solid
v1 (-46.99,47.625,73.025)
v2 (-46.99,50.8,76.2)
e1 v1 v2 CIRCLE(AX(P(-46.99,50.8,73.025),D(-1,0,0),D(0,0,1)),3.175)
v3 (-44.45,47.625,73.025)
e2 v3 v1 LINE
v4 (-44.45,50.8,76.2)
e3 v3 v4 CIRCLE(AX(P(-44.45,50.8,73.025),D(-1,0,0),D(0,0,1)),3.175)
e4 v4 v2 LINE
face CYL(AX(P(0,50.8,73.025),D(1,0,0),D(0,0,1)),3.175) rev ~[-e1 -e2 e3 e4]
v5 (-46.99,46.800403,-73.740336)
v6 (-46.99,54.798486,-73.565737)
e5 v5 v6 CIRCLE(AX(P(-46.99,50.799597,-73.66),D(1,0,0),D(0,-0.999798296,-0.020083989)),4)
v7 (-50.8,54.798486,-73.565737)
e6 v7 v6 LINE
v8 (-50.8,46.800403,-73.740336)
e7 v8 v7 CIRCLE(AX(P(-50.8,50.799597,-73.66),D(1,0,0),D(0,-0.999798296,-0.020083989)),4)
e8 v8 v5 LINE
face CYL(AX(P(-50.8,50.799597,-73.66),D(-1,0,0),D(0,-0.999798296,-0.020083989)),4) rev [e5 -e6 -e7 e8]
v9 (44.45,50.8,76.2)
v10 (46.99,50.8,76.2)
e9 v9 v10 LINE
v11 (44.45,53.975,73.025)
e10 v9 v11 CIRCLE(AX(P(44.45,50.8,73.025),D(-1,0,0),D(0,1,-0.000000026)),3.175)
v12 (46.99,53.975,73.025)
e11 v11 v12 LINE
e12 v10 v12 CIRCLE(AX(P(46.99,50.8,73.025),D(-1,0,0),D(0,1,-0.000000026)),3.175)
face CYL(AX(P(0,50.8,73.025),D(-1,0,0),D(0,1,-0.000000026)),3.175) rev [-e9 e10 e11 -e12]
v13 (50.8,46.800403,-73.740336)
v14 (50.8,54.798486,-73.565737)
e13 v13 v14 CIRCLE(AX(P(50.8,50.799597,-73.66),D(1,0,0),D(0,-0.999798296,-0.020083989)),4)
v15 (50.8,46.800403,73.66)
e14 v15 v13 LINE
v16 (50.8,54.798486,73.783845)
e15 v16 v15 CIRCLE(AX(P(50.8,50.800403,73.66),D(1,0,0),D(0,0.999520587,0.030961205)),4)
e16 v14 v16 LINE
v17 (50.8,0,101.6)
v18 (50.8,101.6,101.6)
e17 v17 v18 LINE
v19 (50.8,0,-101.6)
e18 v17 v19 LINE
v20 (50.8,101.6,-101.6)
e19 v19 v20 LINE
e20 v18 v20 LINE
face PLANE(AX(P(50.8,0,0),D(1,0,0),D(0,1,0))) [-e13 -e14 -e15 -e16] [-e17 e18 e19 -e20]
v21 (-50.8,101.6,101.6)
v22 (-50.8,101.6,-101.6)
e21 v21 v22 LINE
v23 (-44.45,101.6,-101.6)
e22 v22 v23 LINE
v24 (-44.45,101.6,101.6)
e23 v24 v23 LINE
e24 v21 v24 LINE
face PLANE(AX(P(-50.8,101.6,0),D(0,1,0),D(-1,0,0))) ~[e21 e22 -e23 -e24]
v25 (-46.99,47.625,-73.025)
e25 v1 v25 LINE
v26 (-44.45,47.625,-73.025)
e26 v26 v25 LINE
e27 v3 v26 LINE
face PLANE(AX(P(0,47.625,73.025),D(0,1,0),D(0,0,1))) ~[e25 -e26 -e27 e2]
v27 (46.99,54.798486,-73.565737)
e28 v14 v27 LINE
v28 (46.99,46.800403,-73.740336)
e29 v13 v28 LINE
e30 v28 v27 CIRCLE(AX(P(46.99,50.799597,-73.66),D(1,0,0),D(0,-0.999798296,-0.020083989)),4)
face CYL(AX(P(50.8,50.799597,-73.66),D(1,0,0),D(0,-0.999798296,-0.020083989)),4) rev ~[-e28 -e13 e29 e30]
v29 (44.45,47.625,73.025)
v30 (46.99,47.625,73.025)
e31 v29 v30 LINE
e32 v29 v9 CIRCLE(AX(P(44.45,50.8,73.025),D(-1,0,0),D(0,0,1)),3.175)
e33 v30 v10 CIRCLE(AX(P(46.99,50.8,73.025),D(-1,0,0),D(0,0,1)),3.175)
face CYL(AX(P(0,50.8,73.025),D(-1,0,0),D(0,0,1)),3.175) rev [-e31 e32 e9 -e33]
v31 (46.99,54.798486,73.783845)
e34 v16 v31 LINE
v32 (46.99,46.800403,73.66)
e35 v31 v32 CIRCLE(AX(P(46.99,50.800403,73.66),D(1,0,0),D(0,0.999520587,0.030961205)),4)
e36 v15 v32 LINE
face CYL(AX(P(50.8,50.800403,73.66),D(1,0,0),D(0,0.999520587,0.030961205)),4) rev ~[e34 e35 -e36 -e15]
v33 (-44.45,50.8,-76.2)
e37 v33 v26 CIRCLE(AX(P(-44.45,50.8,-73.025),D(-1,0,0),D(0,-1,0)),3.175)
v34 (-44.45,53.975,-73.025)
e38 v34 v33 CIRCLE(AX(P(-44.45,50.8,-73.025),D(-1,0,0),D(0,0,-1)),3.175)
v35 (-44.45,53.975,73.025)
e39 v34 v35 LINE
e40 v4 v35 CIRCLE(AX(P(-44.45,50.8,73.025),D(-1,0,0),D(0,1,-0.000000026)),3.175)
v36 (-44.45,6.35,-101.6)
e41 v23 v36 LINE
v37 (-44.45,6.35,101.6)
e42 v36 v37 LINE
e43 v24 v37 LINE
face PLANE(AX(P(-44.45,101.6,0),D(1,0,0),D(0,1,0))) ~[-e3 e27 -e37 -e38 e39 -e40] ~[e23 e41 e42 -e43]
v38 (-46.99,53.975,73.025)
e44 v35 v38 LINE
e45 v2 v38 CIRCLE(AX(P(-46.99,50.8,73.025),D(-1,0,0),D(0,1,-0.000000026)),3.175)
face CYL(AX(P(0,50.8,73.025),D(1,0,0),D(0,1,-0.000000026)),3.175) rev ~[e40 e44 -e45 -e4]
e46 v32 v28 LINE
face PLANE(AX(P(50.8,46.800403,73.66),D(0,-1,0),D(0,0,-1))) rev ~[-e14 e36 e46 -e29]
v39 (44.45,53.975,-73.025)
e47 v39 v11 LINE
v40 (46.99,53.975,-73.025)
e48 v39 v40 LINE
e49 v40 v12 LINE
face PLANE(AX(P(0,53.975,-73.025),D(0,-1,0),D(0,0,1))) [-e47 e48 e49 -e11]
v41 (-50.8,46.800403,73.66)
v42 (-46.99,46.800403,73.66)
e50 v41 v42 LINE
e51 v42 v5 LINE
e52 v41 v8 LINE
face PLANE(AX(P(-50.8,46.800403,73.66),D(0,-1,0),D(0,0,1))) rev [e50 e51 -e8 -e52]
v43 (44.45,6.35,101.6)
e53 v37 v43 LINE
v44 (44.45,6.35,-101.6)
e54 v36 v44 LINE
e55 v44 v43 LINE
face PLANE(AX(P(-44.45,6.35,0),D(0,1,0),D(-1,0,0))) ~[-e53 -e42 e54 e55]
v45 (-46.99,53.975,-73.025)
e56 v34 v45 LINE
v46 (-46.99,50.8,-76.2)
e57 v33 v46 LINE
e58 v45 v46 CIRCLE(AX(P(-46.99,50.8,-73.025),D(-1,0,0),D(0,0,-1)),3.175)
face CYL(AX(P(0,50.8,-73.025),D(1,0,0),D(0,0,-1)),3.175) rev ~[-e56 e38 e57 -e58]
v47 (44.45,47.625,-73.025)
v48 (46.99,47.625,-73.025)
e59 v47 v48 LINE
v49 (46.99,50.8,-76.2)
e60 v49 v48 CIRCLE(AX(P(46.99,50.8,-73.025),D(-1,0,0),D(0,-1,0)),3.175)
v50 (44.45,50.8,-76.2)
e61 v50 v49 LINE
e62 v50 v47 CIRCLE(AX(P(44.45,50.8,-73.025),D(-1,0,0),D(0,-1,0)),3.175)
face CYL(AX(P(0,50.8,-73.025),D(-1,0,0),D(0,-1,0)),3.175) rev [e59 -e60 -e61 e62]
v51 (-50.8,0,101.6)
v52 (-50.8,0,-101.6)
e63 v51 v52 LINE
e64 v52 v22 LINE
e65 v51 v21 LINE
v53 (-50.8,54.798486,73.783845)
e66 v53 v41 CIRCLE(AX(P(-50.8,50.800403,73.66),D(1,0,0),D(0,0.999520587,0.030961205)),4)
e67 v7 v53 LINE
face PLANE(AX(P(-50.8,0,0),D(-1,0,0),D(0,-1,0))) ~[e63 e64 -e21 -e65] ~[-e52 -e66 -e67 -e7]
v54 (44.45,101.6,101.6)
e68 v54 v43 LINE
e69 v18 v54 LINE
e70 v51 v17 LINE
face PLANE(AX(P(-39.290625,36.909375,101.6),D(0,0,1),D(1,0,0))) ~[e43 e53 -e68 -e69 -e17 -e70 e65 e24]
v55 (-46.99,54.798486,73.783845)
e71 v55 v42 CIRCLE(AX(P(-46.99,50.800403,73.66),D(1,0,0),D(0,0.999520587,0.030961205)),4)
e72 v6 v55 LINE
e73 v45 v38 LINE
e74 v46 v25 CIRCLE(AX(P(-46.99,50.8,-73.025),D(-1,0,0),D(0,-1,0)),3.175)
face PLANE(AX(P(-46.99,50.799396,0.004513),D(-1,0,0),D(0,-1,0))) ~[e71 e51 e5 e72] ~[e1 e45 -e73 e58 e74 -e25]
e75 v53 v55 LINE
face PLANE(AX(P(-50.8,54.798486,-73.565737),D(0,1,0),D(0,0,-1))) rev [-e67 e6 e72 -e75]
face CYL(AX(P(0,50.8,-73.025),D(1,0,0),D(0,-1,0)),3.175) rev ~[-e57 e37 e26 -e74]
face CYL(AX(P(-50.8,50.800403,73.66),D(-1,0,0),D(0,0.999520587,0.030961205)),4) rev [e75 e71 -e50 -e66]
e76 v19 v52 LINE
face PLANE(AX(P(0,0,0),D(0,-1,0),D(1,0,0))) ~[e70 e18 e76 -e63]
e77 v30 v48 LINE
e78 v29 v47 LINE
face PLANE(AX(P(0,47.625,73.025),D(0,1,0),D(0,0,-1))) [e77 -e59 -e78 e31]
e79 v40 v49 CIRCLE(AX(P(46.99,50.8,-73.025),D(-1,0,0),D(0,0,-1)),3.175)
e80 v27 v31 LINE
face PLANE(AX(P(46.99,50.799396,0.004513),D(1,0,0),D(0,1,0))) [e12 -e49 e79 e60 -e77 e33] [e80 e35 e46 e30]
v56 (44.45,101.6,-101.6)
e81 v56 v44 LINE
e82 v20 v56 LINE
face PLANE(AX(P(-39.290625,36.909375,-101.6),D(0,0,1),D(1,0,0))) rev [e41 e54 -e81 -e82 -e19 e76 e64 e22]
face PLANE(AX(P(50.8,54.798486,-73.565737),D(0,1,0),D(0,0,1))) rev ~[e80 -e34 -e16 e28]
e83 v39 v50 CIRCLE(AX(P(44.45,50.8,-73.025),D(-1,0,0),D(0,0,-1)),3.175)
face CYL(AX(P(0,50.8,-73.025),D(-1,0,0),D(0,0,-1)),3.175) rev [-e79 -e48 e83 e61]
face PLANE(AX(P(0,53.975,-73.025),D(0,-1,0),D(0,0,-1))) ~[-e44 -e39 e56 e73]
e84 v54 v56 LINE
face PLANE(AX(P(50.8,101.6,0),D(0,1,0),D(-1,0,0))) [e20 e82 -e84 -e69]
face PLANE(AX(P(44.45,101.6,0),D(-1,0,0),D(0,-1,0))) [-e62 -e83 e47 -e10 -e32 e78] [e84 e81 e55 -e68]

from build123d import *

# Parameters (mm, degrees)
F1_DEPTH      = 101.6
F3_DEPTH      = 287
F3_DEPTH_BACK = 50.801
F5_DEPTH      = 3.81


# Not quite as in the source:
# - an extrude ends at something that could not be found from the text; its depth is read off the source's solid


with BuildPart() as f1:
    # F0 (on Top) → F1 (new body, symmetric)
    with BuildSketch(Plane.XY):
        Polygon((44.45, 101.6), (44.45, 6.35), (0, 6.35), (0, 0), (50.8, 0), (50.8, 101.6), align=None)
    extrude(amount=F1_DEPTH, both=True)

    # F2 (on Right) → F3 (cut, two sides)
    with BuildSketch(Plane.YZ) as f3_sk:
        with BuildLine():
            ThreePointArc((47.625, -73.025), (48.5549359697, -75.2700640303), (50.8, -76.2))
            ThreePointArc((50.8, -76.2), (53.0450640303, -75.2700640303), (53.975, -73.025))
            Line((53.975, -73.025), (53.975, 73.0249999165))
            ThreePointArc((53.975, 73.0249999165), (53.0450640598, 75.2700640008), (50.8, 76.2))
            ThreePointArc((50.8, 76.2), (48.5549359697, 75.2700640303), (47.625, 73.025))
            Line((47.625, 73.025), (47.625, -73.025))
        make_face()
    extrude(amount=-F3_DEPTH, mode=Mode.SUBTRACT)
    extrude(f3_sk.sketch, amount=F3_DEPTH_BACK, mode=Mode.SUBTRACT)

    # F4 (on face) → F5 (cut)
    with BuildSketch(Plane.YZ.offset(50.8)):
        with BuildLine():
            Line((54.7984857559, -73.5657372472), (54.7984857559, 73.7838448219))
            ThreePointArc((54.7984857559, 73.7838448219), (50.7384735742, 77.6595205582), (46.8004034081, 73.66))
            Line((46.8004034081, 73.66), (46.8004034081, -73.740335956))
            ThreePointArc((46.8004034081, -73.740335956), (50.8868960802, -77.6590472365), (54.7984857559, -73.5657372472))
        make_face()
    extrude(amount=-F5_DEPTH, mode=Mode.SUBTRACT)

    # F6: F1 across plane


with BuildPart() as f1_1:
    add(f1.part)
    add(f1.part.mirror(Plane.YZ))


solid = f1_1.part
